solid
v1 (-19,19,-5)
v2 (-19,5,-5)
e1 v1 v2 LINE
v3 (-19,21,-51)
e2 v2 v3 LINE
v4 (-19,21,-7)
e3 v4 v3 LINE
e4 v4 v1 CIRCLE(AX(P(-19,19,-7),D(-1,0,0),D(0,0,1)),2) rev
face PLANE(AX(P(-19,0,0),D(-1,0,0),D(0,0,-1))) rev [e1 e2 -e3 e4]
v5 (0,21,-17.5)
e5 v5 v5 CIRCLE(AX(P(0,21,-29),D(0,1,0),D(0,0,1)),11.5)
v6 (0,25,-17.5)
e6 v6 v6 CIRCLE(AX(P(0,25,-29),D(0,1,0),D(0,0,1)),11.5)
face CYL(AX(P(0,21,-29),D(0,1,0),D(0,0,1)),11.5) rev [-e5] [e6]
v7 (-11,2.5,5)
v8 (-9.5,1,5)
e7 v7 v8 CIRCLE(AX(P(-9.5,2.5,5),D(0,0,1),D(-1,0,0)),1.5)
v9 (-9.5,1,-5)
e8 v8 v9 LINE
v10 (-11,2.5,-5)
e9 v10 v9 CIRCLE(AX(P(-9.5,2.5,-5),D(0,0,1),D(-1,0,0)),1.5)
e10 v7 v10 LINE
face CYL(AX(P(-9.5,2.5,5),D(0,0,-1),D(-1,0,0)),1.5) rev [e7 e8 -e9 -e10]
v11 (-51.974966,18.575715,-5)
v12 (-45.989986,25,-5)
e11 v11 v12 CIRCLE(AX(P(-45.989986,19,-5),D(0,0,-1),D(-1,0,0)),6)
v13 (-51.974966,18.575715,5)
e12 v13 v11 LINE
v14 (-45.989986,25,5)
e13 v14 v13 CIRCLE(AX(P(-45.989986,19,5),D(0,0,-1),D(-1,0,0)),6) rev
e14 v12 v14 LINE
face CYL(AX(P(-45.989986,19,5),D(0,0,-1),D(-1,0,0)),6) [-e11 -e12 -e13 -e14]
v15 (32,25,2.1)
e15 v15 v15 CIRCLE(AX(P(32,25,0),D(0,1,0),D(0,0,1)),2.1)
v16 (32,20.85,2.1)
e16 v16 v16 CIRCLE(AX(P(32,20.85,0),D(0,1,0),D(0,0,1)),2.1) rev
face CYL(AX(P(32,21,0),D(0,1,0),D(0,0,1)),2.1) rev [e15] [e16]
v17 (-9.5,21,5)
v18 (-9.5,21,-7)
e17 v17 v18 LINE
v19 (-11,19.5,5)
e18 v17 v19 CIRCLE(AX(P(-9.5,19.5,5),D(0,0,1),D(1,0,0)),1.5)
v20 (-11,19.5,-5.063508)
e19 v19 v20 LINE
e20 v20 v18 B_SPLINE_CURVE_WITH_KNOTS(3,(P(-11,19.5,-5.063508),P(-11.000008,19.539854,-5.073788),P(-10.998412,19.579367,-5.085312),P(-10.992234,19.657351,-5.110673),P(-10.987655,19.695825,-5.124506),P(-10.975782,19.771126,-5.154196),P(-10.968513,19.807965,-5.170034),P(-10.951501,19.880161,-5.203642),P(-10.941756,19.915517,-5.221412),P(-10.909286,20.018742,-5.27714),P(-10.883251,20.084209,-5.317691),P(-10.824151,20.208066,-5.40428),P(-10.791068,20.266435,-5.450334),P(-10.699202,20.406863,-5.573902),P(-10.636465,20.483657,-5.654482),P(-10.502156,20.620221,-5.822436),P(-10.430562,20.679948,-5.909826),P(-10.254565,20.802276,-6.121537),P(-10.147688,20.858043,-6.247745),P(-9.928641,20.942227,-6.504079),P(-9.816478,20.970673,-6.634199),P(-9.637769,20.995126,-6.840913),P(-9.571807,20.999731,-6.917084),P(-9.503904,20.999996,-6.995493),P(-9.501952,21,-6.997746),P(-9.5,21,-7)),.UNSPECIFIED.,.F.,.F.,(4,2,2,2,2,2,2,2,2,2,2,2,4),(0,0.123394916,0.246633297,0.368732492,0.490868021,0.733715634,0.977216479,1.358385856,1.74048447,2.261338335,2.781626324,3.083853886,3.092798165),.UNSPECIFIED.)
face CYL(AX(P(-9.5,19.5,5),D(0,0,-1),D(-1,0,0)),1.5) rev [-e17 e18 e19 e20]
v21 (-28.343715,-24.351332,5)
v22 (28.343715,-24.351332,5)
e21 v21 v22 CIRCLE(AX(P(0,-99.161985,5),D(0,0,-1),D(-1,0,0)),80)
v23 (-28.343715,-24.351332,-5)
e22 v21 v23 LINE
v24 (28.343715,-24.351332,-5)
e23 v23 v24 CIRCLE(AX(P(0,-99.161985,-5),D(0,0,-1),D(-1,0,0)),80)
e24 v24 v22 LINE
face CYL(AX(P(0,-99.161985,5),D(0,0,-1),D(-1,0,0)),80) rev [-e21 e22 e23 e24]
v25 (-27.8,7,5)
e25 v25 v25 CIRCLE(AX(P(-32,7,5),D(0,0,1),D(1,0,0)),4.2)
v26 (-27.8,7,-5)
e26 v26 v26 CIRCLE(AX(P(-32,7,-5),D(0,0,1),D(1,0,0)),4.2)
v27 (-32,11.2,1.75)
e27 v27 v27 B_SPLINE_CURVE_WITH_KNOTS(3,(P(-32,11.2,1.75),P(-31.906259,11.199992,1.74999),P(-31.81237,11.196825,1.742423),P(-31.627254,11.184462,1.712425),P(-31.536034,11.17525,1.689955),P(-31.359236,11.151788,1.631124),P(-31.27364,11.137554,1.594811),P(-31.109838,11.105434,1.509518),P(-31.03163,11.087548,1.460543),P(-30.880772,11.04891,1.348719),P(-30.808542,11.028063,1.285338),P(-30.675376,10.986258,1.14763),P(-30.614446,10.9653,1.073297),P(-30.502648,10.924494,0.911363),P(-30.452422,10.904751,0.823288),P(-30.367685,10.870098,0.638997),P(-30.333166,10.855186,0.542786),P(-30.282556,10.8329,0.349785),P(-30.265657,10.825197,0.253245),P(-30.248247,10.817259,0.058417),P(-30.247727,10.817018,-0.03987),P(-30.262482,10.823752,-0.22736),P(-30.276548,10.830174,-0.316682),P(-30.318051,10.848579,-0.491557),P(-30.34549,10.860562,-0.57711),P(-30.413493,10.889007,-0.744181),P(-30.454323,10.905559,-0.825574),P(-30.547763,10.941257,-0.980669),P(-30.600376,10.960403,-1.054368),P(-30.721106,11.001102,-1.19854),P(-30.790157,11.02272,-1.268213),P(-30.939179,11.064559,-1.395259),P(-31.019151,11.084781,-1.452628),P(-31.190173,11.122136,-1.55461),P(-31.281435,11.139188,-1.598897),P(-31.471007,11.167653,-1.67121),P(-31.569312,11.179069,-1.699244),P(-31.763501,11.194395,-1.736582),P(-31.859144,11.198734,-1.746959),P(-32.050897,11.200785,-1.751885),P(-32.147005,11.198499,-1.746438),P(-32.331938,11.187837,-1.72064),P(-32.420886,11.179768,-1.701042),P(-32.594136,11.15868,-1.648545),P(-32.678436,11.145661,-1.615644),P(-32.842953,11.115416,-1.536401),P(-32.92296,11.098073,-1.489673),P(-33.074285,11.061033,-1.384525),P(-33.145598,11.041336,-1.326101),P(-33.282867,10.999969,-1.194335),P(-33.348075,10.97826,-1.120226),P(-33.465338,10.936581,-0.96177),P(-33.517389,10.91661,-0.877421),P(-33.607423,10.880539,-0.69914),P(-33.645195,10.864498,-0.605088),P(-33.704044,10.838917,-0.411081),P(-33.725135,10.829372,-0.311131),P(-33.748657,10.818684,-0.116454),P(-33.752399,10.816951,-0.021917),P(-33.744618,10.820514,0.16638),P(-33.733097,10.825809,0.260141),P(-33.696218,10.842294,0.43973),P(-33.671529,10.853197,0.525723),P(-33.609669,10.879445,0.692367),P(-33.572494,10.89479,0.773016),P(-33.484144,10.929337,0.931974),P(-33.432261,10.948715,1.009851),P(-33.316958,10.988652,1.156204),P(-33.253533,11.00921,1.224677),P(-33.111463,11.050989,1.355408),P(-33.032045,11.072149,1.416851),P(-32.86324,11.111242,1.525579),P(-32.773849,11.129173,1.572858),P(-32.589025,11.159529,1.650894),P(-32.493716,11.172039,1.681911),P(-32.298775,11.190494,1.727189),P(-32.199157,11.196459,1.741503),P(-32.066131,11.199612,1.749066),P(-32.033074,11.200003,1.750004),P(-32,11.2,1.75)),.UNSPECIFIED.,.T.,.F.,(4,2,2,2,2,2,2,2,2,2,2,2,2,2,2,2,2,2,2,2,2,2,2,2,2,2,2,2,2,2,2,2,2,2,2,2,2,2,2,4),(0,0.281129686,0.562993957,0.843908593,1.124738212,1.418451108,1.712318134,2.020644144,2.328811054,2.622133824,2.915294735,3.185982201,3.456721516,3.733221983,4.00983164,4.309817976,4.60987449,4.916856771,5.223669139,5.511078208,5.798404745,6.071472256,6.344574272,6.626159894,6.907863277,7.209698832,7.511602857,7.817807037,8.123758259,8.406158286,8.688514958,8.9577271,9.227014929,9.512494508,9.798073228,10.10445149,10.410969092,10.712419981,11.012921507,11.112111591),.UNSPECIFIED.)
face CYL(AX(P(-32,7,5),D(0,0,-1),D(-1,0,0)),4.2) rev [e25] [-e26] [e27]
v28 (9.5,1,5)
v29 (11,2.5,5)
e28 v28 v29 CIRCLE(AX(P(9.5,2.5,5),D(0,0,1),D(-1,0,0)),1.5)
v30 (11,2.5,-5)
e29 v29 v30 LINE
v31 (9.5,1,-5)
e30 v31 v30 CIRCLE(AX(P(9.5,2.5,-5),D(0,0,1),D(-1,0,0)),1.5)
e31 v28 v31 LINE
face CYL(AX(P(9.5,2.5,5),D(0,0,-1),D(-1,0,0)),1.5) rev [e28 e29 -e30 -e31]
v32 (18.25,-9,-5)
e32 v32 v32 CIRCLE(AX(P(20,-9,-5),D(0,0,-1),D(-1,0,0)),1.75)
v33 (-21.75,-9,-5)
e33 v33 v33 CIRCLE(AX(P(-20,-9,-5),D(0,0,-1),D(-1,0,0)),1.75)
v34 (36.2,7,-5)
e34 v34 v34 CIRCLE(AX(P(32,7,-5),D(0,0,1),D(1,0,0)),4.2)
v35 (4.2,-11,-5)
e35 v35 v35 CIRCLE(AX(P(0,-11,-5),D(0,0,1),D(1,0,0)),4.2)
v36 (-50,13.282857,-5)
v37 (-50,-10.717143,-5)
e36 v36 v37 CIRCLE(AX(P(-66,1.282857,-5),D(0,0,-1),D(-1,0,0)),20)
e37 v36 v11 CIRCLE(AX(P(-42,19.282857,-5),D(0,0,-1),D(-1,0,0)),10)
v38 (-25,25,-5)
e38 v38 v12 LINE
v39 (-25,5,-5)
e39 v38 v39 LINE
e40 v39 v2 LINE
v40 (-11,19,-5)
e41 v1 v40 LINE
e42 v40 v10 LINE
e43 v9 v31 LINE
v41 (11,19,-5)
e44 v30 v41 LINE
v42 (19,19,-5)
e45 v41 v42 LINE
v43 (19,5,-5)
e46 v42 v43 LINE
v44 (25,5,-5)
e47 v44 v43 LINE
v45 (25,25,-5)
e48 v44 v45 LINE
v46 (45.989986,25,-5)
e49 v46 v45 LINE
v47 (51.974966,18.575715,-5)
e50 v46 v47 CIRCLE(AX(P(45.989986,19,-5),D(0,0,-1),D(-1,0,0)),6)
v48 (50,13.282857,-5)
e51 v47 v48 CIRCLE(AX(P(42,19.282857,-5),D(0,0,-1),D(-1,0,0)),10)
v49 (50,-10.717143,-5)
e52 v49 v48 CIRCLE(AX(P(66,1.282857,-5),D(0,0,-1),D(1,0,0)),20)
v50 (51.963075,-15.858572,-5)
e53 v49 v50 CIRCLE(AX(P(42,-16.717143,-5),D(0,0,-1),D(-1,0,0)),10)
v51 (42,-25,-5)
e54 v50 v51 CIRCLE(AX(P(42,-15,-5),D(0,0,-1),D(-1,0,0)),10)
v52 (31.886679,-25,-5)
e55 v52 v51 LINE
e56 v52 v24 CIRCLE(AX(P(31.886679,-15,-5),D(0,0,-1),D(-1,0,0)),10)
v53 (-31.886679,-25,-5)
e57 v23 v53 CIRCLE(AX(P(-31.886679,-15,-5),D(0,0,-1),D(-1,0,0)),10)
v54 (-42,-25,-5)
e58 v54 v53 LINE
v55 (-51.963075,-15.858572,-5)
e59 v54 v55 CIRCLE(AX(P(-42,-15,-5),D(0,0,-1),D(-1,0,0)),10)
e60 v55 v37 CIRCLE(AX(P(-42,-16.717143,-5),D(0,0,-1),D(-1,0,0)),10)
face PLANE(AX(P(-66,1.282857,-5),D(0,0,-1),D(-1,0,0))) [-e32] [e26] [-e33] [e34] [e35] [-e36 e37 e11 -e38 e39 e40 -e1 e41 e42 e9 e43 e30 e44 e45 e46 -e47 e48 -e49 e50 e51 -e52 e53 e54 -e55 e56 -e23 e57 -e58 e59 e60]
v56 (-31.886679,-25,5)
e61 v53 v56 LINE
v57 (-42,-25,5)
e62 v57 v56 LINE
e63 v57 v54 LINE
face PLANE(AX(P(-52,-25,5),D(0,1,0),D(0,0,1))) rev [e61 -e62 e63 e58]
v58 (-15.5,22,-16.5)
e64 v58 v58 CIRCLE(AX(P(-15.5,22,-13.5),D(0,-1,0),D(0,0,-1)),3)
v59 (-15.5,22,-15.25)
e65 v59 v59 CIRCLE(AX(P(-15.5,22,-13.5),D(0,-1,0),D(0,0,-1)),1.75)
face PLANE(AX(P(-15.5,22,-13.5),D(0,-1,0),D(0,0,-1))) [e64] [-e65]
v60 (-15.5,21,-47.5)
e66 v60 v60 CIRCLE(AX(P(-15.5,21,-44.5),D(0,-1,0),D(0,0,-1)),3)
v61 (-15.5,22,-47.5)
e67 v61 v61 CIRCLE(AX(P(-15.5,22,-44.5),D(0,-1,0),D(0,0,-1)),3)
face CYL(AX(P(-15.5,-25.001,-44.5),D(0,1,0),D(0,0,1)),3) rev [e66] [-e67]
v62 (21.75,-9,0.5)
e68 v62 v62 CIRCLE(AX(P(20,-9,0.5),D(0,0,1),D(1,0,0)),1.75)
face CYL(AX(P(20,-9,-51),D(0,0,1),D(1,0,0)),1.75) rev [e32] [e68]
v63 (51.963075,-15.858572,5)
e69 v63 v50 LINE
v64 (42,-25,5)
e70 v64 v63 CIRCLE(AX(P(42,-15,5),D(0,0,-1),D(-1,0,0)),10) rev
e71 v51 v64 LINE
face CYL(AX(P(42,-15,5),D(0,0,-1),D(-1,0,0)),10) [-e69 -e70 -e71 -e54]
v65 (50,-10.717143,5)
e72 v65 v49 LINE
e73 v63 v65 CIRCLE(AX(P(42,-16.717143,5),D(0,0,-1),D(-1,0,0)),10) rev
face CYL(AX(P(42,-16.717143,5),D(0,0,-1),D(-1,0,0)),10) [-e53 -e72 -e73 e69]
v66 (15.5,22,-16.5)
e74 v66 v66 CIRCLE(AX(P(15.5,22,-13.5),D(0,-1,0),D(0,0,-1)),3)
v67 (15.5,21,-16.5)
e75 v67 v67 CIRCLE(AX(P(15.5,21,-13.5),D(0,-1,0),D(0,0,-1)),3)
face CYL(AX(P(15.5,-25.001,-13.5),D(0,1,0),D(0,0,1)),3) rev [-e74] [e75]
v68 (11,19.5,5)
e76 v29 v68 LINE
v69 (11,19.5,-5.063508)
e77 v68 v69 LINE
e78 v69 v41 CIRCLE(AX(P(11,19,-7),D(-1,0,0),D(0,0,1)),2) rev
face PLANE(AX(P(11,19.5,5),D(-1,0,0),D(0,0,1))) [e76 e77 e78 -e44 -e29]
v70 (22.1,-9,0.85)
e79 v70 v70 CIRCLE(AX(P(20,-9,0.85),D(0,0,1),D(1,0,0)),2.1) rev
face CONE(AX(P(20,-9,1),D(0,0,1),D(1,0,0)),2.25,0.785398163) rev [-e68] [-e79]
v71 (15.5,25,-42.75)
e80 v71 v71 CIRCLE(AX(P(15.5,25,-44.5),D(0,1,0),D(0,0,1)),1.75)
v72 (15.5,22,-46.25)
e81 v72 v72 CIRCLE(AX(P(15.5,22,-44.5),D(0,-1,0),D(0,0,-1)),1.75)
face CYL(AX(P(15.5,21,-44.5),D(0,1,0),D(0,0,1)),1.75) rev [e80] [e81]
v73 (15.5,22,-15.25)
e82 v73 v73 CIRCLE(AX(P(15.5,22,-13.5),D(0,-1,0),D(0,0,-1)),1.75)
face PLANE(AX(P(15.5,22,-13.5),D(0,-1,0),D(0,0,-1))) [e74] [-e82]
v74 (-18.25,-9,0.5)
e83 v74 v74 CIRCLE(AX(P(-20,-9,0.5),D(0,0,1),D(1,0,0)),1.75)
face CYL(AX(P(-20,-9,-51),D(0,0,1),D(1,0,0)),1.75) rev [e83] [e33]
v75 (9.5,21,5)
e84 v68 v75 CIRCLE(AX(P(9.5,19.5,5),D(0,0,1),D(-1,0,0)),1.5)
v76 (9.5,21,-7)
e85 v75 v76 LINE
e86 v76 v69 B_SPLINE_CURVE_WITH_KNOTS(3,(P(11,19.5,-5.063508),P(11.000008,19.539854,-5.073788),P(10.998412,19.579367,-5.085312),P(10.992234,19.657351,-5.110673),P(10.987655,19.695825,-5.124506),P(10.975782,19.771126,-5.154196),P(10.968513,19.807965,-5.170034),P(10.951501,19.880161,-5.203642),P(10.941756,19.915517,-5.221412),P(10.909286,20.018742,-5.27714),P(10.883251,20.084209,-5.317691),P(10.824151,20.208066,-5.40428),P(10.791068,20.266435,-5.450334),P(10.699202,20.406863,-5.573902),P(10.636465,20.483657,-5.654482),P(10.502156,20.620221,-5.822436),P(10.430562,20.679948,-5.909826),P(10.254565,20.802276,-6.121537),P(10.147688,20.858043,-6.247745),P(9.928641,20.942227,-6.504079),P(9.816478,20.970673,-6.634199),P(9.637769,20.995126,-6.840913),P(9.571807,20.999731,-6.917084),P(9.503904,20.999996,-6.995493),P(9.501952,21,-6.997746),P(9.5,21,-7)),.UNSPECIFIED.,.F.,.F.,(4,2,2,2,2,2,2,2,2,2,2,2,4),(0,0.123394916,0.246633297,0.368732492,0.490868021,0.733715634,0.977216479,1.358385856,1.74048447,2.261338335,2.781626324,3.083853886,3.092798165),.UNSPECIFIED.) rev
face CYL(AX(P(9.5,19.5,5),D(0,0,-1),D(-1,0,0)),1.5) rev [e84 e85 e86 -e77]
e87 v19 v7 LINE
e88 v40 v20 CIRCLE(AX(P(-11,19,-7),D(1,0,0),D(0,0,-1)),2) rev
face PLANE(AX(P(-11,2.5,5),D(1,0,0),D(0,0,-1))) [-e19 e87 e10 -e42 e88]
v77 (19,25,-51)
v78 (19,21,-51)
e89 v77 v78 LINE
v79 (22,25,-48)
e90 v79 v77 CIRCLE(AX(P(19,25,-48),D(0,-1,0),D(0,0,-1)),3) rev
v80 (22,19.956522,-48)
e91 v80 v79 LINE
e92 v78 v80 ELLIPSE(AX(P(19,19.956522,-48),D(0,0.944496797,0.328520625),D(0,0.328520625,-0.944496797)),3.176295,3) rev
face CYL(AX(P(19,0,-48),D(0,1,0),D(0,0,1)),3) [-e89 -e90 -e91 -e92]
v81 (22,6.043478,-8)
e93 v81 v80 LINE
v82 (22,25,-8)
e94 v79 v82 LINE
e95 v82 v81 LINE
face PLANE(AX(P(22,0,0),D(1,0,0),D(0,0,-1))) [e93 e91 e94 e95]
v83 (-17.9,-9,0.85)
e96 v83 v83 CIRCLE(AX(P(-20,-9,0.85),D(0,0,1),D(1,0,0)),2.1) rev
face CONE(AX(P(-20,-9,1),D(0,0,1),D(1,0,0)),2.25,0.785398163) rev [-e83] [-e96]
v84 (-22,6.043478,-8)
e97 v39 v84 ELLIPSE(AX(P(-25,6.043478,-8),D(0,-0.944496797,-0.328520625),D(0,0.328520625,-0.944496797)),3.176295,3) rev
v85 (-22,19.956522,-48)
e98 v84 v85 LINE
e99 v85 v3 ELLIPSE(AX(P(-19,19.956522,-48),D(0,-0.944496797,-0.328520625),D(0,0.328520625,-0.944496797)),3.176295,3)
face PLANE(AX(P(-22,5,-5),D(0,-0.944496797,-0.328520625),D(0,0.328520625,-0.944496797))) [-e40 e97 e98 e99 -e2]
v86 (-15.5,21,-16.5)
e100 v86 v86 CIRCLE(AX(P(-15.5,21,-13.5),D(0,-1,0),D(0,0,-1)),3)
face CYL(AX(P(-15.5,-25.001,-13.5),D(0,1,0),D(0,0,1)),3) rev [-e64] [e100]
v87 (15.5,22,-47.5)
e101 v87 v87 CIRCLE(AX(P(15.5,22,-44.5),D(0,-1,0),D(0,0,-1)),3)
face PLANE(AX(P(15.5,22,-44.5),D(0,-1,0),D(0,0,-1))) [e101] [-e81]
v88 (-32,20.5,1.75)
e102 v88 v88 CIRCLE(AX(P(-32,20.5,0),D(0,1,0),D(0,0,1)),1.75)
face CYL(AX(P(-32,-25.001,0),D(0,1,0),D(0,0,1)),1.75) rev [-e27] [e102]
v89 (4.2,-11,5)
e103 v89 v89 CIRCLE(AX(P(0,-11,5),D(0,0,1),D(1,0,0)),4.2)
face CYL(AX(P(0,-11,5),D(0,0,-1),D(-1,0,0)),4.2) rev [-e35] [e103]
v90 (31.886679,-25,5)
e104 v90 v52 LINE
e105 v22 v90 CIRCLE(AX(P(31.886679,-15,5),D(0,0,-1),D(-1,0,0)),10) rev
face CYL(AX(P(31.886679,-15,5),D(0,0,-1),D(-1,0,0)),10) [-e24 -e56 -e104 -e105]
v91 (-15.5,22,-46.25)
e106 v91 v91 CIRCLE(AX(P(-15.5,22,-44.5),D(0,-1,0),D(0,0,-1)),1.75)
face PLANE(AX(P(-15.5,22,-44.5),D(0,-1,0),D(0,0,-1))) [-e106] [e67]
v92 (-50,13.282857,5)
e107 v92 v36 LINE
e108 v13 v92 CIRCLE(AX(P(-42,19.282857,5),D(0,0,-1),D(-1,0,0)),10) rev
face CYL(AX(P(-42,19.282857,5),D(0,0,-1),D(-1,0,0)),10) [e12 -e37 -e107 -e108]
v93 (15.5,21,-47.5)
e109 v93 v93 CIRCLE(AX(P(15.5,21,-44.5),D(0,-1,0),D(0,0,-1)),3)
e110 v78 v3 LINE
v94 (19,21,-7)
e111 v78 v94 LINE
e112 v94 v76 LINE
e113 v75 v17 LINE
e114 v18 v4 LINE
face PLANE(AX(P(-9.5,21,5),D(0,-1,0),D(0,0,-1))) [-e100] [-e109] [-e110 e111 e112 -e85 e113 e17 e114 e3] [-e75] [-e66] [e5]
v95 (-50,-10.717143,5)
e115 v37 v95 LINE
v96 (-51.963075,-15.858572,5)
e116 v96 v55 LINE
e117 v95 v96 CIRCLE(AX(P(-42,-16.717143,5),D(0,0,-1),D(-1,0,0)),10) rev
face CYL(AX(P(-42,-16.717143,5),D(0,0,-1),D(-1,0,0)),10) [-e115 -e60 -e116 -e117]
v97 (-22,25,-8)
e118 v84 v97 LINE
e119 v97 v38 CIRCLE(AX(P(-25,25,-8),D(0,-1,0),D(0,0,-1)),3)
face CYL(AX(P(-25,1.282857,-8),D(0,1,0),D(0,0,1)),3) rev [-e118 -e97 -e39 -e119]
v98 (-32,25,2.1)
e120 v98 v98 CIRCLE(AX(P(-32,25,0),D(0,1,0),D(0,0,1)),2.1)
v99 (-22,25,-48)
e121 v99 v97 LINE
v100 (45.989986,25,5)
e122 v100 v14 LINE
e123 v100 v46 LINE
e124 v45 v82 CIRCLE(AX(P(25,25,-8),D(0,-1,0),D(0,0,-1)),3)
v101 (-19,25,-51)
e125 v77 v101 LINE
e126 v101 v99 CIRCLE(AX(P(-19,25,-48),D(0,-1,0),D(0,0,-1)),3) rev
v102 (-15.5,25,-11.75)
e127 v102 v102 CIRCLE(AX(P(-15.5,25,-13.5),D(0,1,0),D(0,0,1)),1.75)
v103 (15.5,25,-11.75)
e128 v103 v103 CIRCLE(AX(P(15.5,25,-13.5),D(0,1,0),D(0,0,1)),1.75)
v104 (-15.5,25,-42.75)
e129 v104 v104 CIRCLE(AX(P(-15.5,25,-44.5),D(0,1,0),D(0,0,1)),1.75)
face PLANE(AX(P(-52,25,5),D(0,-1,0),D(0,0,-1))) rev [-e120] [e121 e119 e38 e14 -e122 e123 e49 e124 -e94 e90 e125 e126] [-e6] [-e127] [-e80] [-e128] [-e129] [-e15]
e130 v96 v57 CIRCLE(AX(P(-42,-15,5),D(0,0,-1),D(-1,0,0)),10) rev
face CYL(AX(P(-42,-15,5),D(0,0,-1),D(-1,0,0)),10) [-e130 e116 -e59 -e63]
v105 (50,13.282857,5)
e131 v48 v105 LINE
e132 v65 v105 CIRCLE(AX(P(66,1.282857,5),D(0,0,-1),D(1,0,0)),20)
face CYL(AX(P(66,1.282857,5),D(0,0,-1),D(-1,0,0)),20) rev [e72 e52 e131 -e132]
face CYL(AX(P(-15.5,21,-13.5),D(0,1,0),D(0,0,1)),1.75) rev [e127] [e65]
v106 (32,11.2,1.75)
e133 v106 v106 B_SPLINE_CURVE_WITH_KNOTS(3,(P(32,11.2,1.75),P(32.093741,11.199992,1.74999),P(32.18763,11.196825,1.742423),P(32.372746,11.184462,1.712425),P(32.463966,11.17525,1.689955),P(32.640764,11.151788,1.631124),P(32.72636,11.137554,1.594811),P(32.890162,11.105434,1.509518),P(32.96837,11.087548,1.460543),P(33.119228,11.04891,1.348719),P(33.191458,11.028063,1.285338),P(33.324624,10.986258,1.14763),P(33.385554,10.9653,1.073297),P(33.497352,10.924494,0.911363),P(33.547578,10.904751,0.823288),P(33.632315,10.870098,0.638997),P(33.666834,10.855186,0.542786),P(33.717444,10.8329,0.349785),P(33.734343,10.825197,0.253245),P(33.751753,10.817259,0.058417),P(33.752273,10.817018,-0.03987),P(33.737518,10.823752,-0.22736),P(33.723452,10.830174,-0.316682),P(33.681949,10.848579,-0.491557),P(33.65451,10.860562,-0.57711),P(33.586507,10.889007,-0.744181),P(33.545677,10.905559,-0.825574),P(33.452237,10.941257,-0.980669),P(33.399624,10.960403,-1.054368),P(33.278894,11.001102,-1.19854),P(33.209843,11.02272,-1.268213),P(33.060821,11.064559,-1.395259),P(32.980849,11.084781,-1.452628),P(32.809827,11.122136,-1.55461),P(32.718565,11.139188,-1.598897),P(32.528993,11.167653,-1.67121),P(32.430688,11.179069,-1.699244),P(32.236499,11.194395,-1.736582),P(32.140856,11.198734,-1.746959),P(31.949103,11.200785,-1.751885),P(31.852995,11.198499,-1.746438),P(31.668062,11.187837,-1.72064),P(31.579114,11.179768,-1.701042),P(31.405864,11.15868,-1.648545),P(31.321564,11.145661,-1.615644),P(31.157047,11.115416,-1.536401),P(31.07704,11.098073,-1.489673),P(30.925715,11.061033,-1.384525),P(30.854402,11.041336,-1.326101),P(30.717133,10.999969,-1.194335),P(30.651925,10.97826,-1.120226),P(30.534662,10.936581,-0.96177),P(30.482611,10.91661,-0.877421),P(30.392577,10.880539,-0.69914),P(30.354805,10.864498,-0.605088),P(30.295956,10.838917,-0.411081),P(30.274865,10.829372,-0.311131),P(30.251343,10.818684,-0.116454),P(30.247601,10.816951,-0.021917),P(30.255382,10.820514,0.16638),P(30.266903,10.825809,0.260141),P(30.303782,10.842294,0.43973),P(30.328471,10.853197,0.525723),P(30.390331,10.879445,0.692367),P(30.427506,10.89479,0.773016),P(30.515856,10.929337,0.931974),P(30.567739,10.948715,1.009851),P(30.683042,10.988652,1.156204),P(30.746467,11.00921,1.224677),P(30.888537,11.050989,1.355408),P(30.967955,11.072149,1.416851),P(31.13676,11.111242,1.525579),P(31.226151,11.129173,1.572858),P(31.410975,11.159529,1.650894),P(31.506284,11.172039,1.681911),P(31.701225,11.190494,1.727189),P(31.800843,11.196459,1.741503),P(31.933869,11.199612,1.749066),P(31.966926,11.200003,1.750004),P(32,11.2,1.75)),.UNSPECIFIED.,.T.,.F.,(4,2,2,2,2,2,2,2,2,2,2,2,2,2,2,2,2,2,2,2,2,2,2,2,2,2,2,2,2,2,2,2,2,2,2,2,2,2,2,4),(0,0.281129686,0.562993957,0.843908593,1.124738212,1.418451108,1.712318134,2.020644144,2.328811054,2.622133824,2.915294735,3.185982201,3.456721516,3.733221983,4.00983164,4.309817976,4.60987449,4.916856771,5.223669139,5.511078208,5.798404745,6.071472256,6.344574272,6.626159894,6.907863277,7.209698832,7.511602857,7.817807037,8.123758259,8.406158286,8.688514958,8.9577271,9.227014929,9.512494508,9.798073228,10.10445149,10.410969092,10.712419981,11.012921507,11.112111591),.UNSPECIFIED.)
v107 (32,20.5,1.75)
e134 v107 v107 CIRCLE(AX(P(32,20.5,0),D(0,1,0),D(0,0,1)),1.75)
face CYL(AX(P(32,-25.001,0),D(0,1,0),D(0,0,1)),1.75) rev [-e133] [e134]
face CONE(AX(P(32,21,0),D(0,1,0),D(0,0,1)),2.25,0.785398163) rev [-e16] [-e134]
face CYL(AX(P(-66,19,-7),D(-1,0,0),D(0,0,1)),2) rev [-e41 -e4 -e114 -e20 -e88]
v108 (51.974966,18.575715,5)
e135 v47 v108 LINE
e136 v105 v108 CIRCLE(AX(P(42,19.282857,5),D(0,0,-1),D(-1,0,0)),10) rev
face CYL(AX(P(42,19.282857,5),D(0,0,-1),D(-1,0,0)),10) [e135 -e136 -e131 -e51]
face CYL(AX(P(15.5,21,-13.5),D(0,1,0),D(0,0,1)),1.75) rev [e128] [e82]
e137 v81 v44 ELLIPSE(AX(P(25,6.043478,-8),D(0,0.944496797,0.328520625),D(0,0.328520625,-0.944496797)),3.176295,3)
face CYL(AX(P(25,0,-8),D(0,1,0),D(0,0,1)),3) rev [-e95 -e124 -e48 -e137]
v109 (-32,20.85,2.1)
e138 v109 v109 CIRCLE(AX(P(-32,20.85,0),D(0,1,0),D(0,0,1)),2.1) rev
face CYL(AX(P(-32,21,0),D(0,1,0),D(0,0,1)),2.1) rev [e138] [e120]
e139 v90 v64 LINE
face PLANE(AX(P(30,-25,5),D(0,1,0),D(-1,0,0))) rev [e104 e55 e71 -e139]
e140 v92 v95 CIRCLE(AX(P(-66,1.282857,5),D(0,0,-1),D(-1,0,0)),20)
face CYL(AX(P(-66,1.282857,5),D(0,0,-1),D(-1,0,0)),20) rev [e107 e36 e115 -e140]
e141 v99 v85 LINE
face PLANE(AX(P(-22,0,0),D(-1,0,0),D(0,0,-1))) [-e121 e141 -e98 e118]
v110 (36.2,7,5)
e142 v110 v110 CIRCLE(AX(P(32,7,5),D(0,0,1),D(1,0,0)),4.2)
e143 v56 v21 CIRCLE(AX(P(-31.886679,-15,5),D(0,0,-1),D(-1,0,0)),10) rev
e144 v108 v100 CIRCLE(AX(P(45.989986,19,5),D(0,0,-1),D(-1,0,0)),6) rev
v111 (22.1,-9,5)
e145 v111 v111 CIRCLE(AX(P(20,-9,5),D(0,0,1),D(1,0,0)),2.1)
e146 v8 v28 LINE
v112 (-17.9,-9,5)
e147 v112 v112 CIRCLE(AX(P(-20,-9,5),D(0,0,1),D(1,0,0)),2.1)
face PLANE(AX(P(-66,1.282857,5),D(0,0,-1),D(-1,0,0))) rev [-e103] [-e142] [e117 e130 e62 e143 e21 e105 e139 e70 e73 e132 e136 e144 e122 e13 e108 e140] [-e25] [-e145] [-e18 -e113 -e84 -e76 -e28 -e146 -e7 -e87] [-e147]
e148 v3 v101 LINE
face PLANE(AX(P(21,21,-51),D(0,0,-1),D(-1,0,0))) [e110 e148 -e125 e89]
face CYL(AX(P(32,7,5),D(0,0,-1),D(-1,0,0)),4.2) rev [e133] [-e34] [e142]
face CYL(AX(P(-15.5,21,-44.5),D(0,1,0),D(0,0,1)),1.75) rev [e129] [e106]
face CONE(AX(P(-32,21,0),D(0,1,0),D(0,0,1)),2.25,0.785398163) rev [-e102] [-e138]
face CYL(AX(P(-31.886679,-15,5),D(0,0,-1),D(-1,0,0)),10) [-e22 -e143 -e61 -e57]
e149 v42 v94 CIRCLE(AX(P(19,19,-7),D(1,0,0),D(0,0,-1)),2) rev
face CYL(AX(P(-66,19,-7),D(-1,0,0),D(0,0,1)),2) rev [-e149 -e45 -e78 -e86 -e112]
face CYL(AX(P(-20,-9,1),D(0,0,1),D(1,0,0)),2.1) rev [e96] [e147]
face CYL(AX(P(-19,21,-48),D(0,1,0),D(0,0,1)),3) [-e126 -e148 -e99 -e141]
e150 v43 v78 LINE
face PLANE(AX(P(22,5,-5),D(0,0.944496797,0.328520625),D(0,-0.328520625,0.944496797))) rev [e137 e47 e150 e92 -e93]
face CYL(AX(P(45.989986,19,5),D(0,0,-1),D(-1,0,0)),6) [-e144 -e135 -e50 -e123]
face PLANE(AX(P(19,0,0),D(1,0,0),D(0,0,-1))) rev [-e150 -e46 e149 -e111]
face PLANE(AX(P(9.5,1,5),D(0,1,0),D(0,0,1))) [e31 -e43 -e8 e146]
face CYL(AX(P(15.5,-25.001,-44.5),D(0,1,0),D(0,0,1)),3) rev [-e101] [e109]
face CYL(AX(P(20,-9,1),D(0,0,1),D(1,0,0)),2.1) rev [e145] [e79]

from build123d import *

# Parameters (mm, degrees)
SKETCH1_R           = 4.2
BOSS_EXTRUDE1_DEPTH = 5
FILLET1_R           = 10
FILLET2_R           = 6
SKETCH2_W           = 42
SKETCH2_H           = 46
SKETCH2_R           = 11.5
SKETCH2_R_2         = 1.75
BOSS_EXTRUDE2_DEPTH = 4
CUT_EXTRUDE1_REACH  = 89.139
CUT_EXTRUDE1_START  = -1
SKETCH3_R           = 3
CUT_EXTRUDE2_REACH  = 90.34
SKETCH4_R           = 1.75
SKETCH5_R           = 2.1
CUT_EXTRUDE3_DEPTH  = 4
BOSS_EXTRUDE3_START = -2
BOSS_EXTRUDE3_DEPTH = 3
FILLET3_R           = 2
FILLET4_R           = 3
SKETCH7_R           = 1.75
CUT_EXTRUDE4_DEPTH  = 81.398748245
SKETCH8_R           = 2.1
CUT_EXTRUDE5_DEPTH  = 4
CHAMFER1_SIZE       = 0.5


with BuildPart() as part:
    # Sketch1 → Boss-Extrude1 (new, symmetric)
    with BuildSketch(Plane.XY):
        with BuildLine():
            Line((-52, 25), (52, 25))
            Line((52, 25), (52, 15.565713714))
            ThreePointArc((52, 15.565713714), (46, 1.282856857), (52, -13))
            Line((52, -13), (52, -25))
            Line((52, -25), (30, -25))
            ThreePointArc((30, -25), (0, -19.161984871), (-30, -25))
            Line((-30, -25), (-52, -25))
            Line((-52, -25), (-52, -13))
            ThreePointArc((-52, -13), (-46, 1.282856857), (-52, 15.565713714))
            Line((-52, 15.565713714), (-52, 25))
        make_face()
        with Locations((0, -11)):
            Circle(SKETCH1_R, mode=Mode.SUBTRACT)
        with Locations((-32, 7)):
            Circle(SKETCH1_R, mode=Mode.SUBTRACT)
        with Locations((32, 7)):
            Circle(SKETCH1_R, mode=Mode.SUBTRACT)
        with BuildLine():
            Line((-9.5, 21), (9.5, 21))
            ThreePointArc((9.5, 21), (10.560660172, 20.560660172), (11, 19.5))
            Line((11, 19.5), (11, 2.5))
            ThreePointArc((11, 2.5), (10.560660172, 1.439339828), (9.5, 1))
            Line((9.5, 1), (-9.5, 1))
            ThreePointArc((-9.5, 1), (-10.560660172, 1.439339828), (-11, 2.5))
            Line((-11, 2.5), (-11, 19.5))
            ThreePointArc((-11, 19.5), (-10.560660172, 20.560660172), (-9.5, 21))
        make_face(mode=Mode.SUBTRACT)
    extrude(amount=BOSS_EXTRUDE1_DEPTH, both=True)

    # Fillet1
    # the kernel refuses this fillet: 10 mm, written as the material it takes off along each edge
    with BuildSketch(Plane(origin=(52, 15.565713714, 14.292857857), x_dir=(-0.6589710561597435, -0.7521682970876347, 0), z_dir=(0, 0, -1))) as fillet1_piece_1:
        with BuildLine():
            CenterArc((3.793793334, 9.971172714), FILLET1_R, 228.778553177, 36.869897646)
            Line((-2.795917228, 2.449489743), (0, 0))
            ThreePointArc((0, 0), (1.517517334, 0.057654573), (3.035034667, 0))
        make_face()
    extrude(amount=28.585715715, mode=Mode.SUBTRACT)
    with BuildSketch(Plane(origin=(52, -13, 14.292857857), x_dir=(0, -1, 0), z_dir=(0, 0, -1)), Plane(origin=(-52, -13, -14.292857857), x_dir=(0, -1, 0), z_dir=(0, 0, 1))) as fillet1_piece_2:
        with BuildLine():
            CenterArc((3.717143143, 10), FILLET1_R, 233.130102354, 36.869897646)
            ThreePointArc((-2.282856857, 2), (-1.103435734, 1.043365942), (0, 0))
            Line((0, 0), (3.717143143, 0))
        make_face()
    extrude(amount=28.585715715, mode=Mode.SUBTRACT)
    with BuildSketch(Plane(origin=(52, -25, 30), x_dir=(-1, 0, 0), z_dir=(0, 0, -1))) as fillet1_piece_3:
        with BuildLine():
            CenterArc((FILLET1_R, FILLET1_R), FILLET1_R, 180, 90)
            Line((0, FILLET1_R), (0, 0))
            Line((0, 0), (FILLET1_R, 0))
        make_face()
    extrude(amount=60, mode=Mode.SUBTRACT)
    with BuildSketch(Plane(origin=(30, -25, 9.716697693), x_dir=(-0.931136532102541, 0.3646707536724787, 0), z_dir=(0, 0, -1))) as fillet1_piece_4:
        with BuildLine():
            CenterArc((1.889951723, 9.999382002), FILLET1_R, 248.612678269, 20.750330625)
            Line((-1.756755813, 0.688016681), (0, 0))
            ThreePointArc((0, 0), (0.889389046, 0.004943983), (1.778778093, 0))
        make_face()
    extrude(amount=19.433395387, mode=Mode.SUBTRACT)
    with BuildSketch(Plane(origin=(-30, -25, 9.716697693), x_dir=(-1, 0, 0), z_dir=(0, 0, -1))) as fillet1_piece_5:
        with BuildLine():
            CenterArc((1.886679077, 10), FILLET1_R, 249.249669375, 20.750330625)
            ThreePointArc((-1.656285265, 0.648668348), (-0.826339706, 0.328937697), (0, 0))
            Line((0, 0), (1.886679077, 0))
        make_face()
    extrude(amount=19.433395387, mode=Mode.SUBTRACT)
    with BuildSketch(Plane(origin=(-52, -25, -30), x_dir=(0, 1, 0), z_dir=(0, 0, 1))) as fillet1_piece_6:
        with BuildLine():
            CenterArc((FILLET1_R, -FILLET1_R), FILLET1_R, 90, 90)
            Line((0, -FILLET1_R), (0, 0))
            Line((0, 0), (FILLET1_R, 0))
        make_face()
    extrude(amount=60, mode=Mode.SUBTRACT)
    with BuildSketch(Plane(origin=(-52, 15.565713714, -14.292857857), x_dir=(0, 1, 0), z_dir=(0, 0, 1))) as fillet1_piece_7:
        with BuildLine():
            CenterArc((3.717143143, -10), FILLET1_R, 90, 36.869897646)
            ThreePointArc((-2.282856857, -2), (-1.103435734, -1.043365942), (0, 0))
            Line((0, 0), (3.717143143, 0))
        make_face()
    extrude(amount=28.585715715, mode=Mode.SUBTRACT)

    # Fillet2
    fillet2_edges = [part.edges().sort_by_distance(p)[0] for p in [
        (52, 25, 0),
        (-52, 25, 0),
    ]]
    fillet(fillet2_edges, radius=FILLET2_R)

    # Sketch2 → Boss-Extrude2 (add)
    with BuildSketch(Plane(origin=(0, 25, -30), x_dir=(-1, 0, 0), z_dir=(0, 1, 0))):
        with Locations((0, 2)):
            Rectangle(SKETCH2_W, SKETCH2_H)
        with Locations(Location((0, 1, 0), (0, 0, 90))):
            Circle(SKETCH2_R, mode=Mode.SUBTRACT)
        with Locations(Location((15.5, 16.5, 0), (0, 0, 90))):
            Circle(SKETCH2_R_2, mode=Mode.SUBTRACT)
        with Locations(Location((-15.5, 16.5, 0), (0, 0, 90))):
            Circle(SKETCH2_R_2, mode=Mode.SUBTRACT)
        with Locations(Location((-15.5, -14.5, 0), (0, 0, 90))):
            Circle(SKETCH2_R_2, mode=Mode.SUBTRACT)
        with Locations(Location((15.5, -14.5, 0), (0, 0, 90))):
            Circle(SKETCH2_R_2, mode=Mode.SUBTRACT)
    extrude(amount=-BOSS_EXTRUDE2_DEPTH)

    # Sketch3 → Cut-Extrude1 (cut, up to next)
    with BuildSketch(Plane.XZ.offset(-21).offset(CUT_EXTRUDE1_START), mode=Mode.PRIVATE) as cut_extrude1_sk1:
        with Locations(Location((-15.5, -44.5, 0), (0, 0, 270))):
            Circle(SKETCH3_R)
    cut_extrude1_tool1 = extrude(cut_extrude1_sk1.sketch, amount=CUT_EXTRUDE1_REACH, mode=Mode.PRIVATE) & part.part
    # Sketch3 → Cut-Extrude1 (cut, up to next)
    with BuildSketch(Plane.XZ.offset(-21).offset(CUT_EXTRUDE1_START), mode=Mode.PRIVATE) as cut_extrude1_sk2:
        with Locations(Location((15.5, -44.5, 0), (0, 0, 270))):
            Circle(SKETCH3_R)
    cut_extrude1_tool2 = extrude(cut_extrude1_sk2.sketch, amount=CUT_EXTRUDE1_REACH, mode=Mode.PRIVATE) & part.part
    # Sketch3 → Cut-Extrude1 (cut, up to next)
    with BuildSketch(Plane.XZ.offset(-21).offset(CUT_EXTRUDE1_START), mode=Mode.PRIVATE) as cut_extrude1_sk3:
        with Locations(Location((15.5, -13.5, 0), (0, 0, 270))):
            Circle(SKETCH3_R)
    cut_extrude1_tool3 = extrude(cut_extrude1_sk3.sketch, amount=CUT_EXTRUDE1_REACH, mode=Mode.PRIVATE) & part.part
    # Sketch3 → Cut-Extrude1 (cut, up to next)
    with BuildSketch(Plane.XZ.offset(-21).offset(CUT_EXTRUDE1_START), mode=Mode.PRIVATE) as cut_extrude1_sk4:
        with Locations(Location((-15.5, -13.5, 0), (0, 0, 270))):
            Circle(SKETCH3_R)
    cut_extrude1_tool4 = extrude(cut_extrude1_sk4.sketch, amount=CUT_EXTRUDE1_REACH, mode=Mode.PRIVATE) & part.part
    add(cut_extrude1_tool1.solids().sort_by_distance((-15.5, 22, -44.5))[0], mode=Mode.SUBTRACT)
    add(cut_extrude1_tool2.solids().sort_by_distance((15.5, 22, -44.5))[0], mode=Mode.SUBTRACT)
    add(cut_extrude1_tool3.solids().sort_by_distance((15.5, 22, -13.5))[0], mode=Mode.SUBTRACT)
    add(cut_extrude1_tool4.solids().sort_by_distance((-15.5, 22, -13.5))[0], mode=Mode.SUBTRACT)

    # Sketch4 → Cut-Extrude2 (cut, up to next)
    with BuildSketch(Plane(origin=(0, 25, 0), x_dir=(1, 0, 0), z_dir=(0, 1, 0)), mode=Mode.PRIVATE) as cut_extrude2_sk1:
        with Locations(Location((-32, 0, 0), (0, 0, 270))):
            Circle(SKETCH4_R)
    cut_extrude2_tool1 = extrude(cut_extrude2_sk1.sketch, amount=-CUT_EXTRUDE2_REACH, mode=Mode.PRIVATE) & part.part
    # Sketch4 → Cut-Extrude2 (cut, up to next)
    with BuildSketch(Plane(origin=(0, 25, 0), x_dir=(1, 0, 0), z_dir=(0, 1, 0)), mode=Mode.PRIVATE) as cut_extrude2_sk2:
        with Locations(Location((32, 0, 0), (0, 0, 270))):
            Circle(SKETCH4_R)
    cut_extrude2_tool2 = extrude(cut_extrude2_sk2.sketch, amount=-CUT_EXTRUDE2_REACH, mode=Mode.PRIVATE) & part.part
    add(cut_extrude2_tool1.solids().sort_by_distance((-32, 25, 0))[0], mode=Mode.SUBTRACT)
    add(cut_extrude2_tool2.solids().sort_by_distance((32, 25, 0))[0], mode=Mode.SUBTRACT)

    # Sketch5 → Cut-Extrude3 (cut)
    with BuildSketch(Plane(origin=(0, 25, 0), x_dir=(1, 0, 0), z_dir=(0, 1, 0))):
        with Locations(Location((-32, 0, 0), (0, 0, 270))):
            Circle(SKETCH5_R)
        with Locations(Location((32, 0, 0), (0, 0, 270))):
            Circle(SKETCH5_R)
    extrude(amount=-CUT_EXTRUDE3_DEPTH, mode=Mode.SUBTRACT)

    # Sketch6 → Boss-Extrude3 (add)
    with BuildSketch(Plane(origin=(21, 0, 0), x_dir=(0, 0, -1), z_dir=(1, 0, 0)).offset(BOSS_EXTRUDE3_START)):
        Polygon((51, 25), (5, 25), (5, 5), (51, 21), align=None)
    boss_extrude3 = extrude(amount=BOSS_EXTRUDE3_DEPTH)

    # Mirror1: Boss-Extrude3 across plane
    add(boss_extrude3.mirror(Plane(origin=(0, 0, 0), x_dir=(0, 0, 1), z_dir=(1, 0, 0))))

    # Fillet3
    fillet3_edges = [part.edges().sort_by_distance(p)[0] for p in [
        (-14.25, 21, -5),
        (14.25, 21, -5),
    ]]
    fillet(fillet3_edges, radius=FILLET3_R)

    # Fillet4
    fillet4_edges = [part.edges().sort_by_distance(p)[0] for p in [
        (22, 15, -5),
        (-22, 15, -5),
        (-22, 23, -51),
        (22, 23, -51),
    ]]
    fillet(fillet4_edges, radius=FILLET4_R)

    # Sketch7 → Cut-Extrude4 (cut, through all)
    with BuildSketch(Plane.XY.offset(5)):
        with Locations((-20, -9)):
            Circle(SKETCH7_R)
        with Locations((20, -9)):
            Circle(SKETCH7_R)
    extrude(amount=-CUT_EXTRUDE4_DEPTH, mode=Mode.SUBTRACT)

    # Sketch8 → Cut-Extrude5 (cut)
    with BuildSketch(Plane.XY.offset(5)):
        with Locations((-20, -9)):
            Circle(SKETCH8_R)
        with Locations((20, -9)):
            Circle(SKETCH8_R)
    extrude(amount=-CUT_EXTRUDE5_DEPTH, mode=Mode.SUBTRACT)

    # Chamfer1
    # the kernel refuses this chamfer: 0.5 mm, written as the material it takes off along each edge
    with BuildSketch(Plane(origin=(-32, 21, 0), x_dir=(0, 0, 1), z_dir=(-1, 0, 0))) as chamfer1_piece_1_section:
        Polygon((1.75, -CHAMFER1_SIZE), (1.75 + CHAMFER1_SIZE, 0), (1.75, 0), align=None)
    chamfer1_piece_1 = revolve(axis=Axis((-32, 21, 0), (0, 1, 0)), mode=Mode.PRIVATE)
    chamfer1_piece_1 = chamfer1_piece_1 & Plane(origin=(-32, 20.675956313, 0), x_dir=(0, 0, 1), z_dir=(0, 1, 0)) * Cylinder(2.1, 9, mode=Mode.PRIVATE)
    add(chamfer1_piece_1, mode=Mode.SUBTRACT)
    with BuildSketch(Plane(origin=(32, 21, 0), x_dir=(0, 0, 1), z_dir=(-1, 0, 0))) as chamfer1_piece_2_section:
        Polygon((1.75, -CHAMFER1_SIZE), (1.75 + CHAMFER1_SIZE, 0), (1.75, 0), align=None)
    chamfer1_piece_2 = revolve(axis=Axis((32, 21, 0), (0, 1, 0)), mode=Mode.PRIVATE)
    chamfer1_piece_2 = chamfer1_piece_2 & Plane(origin=(32, 20.675956313, 0), x_dir=(0, 0, 1), z_dir=(0, 1, 0)) * Cylinder(2.1, 10, mode=Mode.PRIVATE)
    add(chamfer1_piece_2, mode=Mode.SUBTRACT)
    with BuildSketch(Plane(origin=(-20, -9, 1), x_dir=(1, 0, 0), z_dir=(0, -1, 0))) as chamfer1_piece_3_section:
        Polygon((1.75, -CHAMFER1_SIZE), (1.75 + CHAMFER1_SIZE, 0), (1.75, 0), align=None)
    chamfer1_piece_3 = revolve(axis=Axis((-20, -9, 1), (0, 0, 1)), mode=Mode.PRIVATE)
    chamfer1_piece_3 = chamfer1_piece_3 & Plane(origin=(-20, -9, 0.675956313), x_dir=(1, 0, 0), z_dir=(0, 0, 1)) * Cylinder(2.1, 9, mode=Mode.PRIVATE)
    add(chamfer1_piece_3, mode=Mode.SUBTRACT)
    with BuildSketch(Plane(origin=(20, -9, 1), x_dir=(1, 0, 0), z_dir=(0, -1, 0))) as chamfer1_piece_4_section:
        Polygon((1.75, -CHAMFER1_SIZE), (1.75 + CHAMFER1_SIZE, 0), (1.75, 0), align=None)
    chamfer1_piece_4 = revolve(axis=Axis((20, -9, 1), (0, 0, 1)), mode=Mode.PRIVATE)
    chamfer1_piece_4 = chamfer1_piece_4 & Plane(origin=(20, -9, 0.675956313), x_dir=(1, 0, 0), z_dir=(0, 0, 1)) * Cylinder(2.1, 9, mode=Mode.PRIVATE)
    add(chamfer1_piece_4, mode=Mode.SUBTRACT)


solid = part.part
